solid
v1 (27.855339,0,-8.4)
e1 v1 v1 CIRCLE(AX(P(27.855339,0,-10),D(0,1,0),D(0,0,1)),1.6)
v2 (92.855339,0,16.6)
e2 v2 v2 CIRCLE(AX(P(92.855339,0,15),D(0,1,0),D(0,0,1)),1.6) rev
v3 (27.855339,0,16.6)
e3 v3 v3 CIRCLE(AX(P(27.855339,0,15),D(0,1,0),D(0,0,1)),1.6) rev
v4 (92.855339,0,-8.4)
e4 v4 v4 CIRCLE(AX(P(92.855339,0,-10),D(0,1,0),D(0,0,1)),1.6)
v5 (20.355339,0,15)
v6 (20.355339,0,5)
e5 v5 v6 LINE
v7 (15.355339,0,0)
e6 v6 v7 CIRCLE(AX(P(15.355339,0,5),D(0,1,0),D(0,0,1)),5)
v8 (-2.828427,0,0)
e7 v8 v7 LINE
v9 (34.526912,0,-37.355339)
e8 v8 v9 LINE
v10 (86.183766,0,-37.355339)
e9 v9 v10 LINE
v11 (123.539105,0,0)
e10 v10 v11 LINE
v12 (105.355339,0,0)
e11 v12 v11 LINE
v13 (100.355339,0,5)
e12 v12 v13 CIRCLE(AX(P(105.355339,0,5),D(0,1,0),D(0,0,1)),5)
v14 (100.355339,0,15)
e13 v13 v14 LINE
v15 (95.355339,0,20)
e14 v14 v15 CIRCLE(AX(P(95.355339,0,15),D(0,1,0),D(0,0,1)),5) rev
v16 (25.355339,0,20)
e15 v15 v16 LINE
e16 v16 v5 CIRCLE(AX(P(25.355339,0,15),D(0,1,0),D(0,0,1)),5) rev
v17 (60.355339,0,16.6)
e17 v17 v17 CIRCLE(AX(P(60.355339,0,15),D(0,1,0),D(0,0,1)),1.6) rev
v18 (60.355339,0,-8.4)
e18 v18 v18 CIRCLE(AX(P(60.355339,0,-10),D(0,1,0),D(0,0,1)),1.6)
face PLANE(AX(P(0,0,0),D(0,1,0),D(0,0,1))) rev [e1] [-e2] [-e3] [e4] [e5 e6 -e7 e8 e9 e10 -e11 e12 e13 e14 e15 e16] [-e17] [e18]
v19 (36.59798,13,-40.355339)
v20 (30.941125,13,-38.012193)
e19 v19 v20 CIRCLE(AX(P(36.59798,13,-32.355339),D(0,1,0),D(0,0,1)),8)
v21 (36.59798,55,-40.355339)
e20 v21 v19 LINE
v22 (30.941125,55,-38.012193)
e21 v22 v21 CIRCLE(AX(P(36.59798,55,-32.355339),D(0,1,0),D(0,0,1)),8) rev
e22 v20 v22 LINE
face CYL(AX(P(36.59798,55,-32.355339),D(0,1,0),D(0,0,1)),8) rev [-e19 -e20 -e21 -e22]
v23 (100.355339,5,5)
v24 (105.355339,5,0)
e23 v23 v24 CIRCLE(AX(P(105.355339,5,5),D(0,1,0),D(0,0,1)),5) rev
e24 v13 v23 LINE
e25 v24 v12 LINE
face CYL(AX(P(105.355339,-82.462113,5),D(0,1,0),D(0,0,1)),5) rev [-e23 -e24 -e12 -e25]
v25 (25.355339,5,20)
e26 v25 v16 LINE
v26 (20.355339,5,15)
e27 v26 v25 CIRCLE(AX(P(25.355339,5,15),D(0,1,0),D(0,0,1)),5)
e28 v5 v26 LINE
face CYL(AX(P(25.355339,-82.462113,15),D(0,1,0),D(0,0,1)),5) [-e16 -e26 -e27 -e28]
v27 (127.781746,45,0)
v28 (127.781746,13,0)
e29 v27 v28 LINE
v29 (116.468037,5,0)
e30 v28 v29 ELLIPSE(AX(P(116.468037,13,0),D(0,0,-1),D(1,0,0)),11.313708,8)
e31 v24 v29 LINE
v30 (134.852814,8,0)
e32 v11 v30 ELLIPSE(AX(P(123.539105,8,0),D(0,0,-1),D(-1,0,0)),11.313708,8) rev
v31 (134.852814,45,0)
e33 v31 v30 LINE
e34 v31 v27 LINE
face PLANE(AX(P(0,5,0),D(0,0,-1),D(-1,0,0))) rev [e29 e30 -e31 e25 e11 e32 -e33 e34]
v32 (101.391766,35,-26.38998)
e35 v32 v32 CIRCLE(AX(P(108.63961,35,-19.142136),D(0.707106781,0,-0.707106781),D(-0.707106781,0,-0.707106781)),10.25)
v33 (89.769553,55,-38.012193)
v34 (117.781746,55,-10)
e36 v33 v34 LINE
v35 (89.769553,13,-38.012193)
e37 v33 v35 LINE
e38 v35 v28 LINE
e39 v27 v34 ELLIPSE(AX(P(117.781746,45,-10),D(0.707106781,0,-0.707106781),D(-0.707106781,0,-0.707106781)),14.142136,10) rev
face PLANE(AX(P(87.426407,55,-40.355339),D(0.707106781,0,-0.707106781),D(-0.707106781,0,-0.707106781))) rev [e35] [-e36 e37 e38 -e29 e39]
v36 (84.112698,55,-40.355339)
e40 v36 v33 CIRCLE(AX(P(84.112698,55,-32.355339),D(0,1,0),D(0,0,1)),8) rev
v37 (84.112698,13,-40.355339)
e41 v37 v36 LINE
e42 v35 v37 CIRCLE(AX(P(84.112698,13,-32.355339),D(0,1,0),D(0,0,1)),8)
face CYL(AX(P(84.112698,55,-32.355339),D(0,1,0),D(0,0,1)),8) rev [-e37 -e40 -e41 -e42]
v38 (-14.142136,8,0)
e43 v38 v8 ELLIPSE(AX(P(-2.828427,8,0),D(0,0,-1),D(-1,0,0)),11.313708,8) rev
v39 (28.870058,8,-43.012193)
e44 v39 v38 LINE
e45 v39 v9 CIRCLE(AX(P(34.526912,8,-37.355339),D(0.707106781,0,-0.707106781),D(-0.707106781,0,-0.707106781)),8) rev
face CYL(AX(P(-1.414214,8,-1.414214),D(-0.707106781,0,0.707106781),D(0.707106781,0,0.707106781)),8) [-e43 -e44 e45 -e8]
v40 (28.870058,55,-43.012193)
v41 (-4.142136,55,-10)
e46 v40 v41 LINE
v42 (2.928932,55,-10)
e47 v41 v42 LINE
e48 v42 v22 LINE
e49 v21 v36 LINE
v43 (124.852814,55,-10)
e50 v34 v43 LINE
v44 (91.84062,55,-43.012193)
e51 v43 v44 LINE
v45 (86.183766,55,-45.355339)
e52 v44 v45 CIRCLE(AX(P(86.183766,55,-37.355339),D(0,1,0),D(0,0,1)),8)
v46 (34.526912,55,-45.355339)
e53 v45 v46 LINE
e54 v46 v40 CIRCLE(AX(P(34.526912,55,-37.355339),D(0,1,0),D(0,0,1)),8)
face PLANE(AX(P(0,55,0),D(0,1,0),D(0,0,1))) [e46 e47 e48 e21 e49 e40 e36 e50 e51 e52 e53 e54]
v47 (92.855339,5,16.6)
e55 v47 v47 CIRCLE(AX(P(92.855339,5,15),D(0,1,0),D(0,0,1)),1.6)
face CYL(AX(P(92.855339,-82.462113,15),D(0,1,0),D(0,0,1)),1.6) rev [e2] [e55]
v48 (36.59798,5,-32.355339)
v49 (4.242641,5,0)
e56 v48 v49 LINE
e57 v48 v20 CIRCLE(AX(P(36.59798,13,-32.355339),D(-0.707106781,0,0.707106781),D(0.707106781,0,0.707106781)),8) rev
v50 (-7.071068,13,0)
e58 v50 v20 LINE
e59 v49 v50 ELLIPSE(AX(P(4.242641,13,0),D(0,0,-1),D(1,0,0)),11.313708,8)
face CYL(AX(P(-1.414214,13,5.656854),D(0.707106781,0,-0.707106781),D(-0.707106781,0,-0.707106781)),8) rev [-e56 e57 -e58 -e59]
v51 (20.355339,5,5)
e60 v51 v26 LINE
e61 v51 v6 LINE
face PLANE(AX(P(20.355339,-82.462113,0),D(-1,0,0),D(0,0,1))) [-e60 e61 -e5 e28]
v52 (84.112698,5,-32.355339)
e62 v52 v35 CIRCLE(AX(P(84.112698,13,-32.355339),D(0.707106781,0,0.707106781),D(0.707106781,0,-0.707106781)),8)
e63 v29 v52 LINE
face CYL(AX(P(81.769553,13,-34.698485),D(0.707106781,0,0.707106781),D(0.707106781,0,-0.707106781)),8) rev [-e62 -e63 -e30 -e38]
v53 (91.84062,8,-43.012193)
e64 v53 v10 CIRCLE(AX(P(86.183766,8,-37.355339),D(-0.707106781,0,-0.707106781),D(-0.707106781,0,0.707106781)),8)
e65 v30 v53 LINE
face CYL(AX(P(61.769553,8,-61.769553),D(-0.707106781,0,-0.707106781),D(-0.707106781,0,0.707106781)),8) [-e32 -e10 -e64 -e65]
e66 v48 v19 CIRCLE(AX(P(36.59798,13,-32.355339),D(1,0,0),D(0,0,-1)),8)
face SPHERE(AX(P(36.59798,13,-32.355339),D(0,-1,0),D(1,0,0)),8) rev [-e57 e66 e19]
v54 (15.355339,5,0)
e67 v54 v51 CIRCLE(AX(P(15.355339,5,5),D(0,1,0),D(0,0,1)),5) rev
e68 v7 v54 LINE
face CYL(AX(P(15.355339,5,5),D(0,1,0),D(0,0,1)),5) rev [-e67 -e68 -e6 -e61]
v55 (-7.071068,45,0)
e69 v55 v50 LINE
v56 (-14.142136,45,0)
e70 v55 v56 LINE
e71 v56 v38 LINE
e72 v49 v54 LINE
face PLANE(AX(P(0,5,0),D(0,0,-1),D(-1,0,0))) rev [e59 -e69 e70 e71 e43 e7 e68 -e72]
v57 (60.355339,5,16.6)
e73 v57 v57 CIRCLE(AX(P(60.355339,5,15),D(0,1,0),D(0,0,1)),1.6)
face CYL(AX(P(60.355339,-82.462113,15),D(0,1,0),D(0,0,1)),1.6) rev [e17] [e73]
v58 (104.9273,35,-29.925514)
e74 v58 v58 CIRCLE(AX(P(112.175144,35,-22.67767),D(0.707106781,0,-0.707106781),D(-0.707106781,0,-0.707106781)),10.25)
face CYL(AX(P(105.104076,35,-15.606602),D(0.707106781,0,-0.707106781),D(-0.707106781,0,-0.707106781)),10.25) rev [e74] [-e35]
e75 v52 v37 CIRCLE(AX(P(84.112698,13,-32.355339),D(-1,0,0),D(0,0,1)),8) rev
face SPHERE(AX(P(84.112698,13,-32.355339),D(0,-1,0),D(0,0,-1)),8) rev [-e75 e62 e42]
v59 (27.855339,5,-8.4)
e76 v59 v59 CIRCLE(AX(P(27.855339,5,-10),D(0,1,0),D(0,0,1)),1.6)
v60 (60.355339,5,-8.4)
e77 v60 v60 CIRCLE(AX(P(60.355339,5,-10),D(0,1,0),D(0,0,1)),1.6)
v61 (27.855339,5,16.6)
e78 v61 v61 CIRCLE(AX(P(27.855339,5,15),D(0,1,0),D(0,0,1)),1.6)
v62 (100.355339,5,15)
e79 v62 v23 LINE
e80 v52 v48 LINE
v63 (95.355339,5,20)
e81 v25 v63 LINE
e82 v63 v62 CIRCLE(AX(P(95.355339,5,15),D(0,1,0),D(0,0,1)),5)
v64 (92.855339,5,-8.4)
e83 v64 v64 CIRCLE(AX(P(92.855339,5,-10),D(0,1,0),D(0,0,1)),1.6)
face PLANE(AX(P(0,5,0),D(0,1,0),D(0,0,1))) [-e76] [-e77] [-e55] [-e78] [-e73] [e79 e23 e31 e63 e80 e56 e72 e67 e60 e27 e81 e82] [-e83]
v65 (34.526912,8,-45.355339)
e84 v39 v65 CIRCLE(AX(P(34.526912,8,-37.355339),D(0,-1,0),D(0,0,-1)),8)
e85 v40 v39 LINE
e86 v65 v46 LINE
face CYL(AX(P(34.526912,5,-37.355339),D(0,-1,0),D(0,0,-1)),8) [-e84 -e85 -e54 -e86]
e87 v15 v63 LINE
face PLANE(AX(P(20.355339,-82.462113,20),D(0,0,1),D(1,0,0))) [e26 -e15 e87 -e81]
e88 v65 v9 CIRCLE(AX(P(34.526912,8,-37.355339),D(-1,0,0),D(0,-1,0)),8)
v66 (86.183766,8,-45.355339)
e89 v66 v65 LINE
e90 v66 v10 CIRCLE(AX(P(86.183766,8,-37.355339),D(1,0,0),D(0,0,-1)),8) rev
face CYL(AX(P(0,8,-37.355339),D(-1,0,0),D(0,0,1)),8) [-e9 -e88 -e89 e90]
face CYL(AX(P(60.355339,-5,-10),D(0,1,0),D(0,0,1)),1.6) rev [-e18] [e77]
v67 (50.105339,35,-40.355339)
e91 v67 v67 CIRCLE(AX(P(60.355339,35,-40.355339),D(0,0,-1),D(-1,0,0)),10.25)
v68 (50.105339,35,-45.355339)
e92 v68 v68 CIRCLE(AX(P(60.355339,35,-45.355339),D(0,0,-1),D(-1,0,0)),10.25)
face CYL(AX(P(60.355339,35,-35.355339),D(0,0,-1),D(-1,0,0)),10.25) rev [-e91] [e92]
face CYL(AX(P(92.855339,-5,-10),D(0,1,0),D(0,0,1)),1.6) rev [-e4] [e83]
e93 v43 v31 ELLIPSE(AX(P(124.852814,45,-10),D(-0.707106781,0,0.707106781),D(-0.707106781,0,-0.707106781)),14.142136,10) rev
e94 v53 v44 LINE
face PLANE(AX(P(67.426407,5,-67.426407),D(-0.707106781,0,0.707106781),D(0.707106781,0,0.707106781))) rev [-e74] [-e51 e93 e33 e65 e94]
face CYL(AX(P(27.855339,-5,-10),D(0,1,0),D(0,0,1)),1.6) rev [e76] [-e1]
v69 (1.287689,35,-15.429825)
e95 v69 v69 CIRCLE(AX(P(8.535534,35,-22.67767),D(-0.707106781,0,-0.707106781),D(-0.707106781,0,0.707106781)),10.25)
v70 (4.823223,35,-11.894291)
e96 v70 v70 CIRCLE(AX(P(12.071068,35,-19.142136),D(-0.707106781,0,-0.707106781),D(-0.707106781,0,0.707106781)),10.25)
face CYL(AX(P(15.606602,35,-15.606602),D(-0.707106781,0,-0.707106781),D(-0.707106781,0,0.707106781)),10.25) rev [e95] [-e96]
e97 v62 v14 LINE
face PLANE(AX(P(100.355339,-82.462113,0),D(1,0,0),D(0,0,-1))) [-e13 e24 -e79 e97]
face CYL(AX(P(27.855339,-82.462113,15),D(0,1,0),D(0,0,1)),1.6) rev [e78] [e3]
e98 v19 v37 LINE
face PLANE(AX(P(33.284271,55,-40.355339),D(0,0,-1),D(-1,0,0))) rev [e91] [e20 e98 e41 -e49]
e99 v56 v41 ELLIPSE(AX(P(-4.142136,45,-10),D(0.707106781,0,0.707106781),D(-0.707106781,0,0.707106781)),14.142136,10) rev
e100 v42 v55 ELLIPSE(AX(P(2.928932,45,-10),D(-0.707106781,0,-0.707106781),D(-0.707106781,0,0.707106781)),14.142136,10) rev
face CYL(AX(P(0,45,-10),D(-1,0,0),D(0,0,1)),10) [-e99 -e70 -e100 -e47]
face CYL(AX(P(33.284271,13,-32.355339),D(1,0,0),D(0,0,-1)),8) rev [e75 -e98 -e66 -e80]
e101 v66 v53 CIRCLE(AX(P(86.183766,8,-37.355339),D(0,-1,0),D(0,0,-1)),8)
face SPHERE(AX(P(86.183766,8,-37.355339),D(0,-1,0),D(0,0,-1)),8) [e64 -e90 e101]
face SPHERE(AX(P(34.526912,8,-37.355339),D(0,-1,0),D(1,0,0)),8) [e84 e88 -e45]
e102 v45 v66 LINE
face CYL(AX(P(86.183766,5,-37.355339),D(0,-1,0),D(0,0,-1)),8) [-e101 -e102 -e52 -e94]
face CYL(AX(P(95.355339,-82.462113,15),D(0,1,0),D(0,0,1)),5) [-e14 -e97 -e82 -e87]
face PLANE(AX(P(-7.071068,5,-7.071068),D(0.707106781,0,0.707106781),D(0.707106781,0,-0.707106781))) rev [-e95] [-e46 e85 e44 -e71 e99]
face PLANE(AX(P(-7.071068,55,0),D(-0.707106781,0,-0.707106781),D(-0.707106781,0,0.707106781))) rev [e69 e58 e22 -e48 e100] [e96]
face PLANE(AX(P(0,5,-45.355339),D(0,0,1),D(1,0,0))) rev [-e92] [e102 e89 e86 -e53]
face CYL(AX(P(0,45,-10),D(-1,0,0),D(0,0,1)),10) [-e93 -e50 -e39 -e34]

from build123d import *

# Parameters (mm, degrees)
BOSS_EXTRUDE1_DEPTH = 5
BOSS_EXTRUDE2_DEPTH = 50
CUT_EXTRUDE1_DEPTH  = 10
SKETCH6_R           = 10.25
CUT_EXTRUDE2_DEPTH  = 10
SKETCH7_R           = 10.25
CUT_EXTRUDE3_DEPTH  = 10
SKETCH8_R           = 1.6
CUT_EXTRUDE4_DEPTH  = 10
FILLET1_R           = 8
SKETCH10_W          = 80
SKETCH10_H          = 20
SKETCH10_R          = 1.6
BOSS_EXTRUDE5_DEPTH = 5
FILLET4_R           = 5
FILLET5_R           = 10


with BuildPart() as part:
    # Sketch2 → Boss-Extrude1 (new body)
    with BuildSketch(Plane(origin=(0, 0, 0), x_dir=(1, 0, 0), z_dir=(0, 1, 0))):
        Polygon((-14.142135624, 0), (0, 0), (35.355339059, 35.355339059), (85.355339059, 35.355339059), (120.710678119, 0), (134.852813742, 0), (89.497474683, 45.355339059), (31.213203436, 45.355339059), align=None)
        Polygon((85.355339059, 35.355339059), (35.355339059, 35.355339059), (0, 0), (120.710678119, 0), align=None)
    extrude(amount=BOSS_EXTRUDE1_DEPTH)

    # Sketch3 → Boss-Extrude2 (add)
    with BuildSketch(Plane(origin=(0, 5, 0), x_dir=(1, 0, 0), z_dir=(0, 1, 0))):
        Polygon((-14.142135624, 0), (31.213203436, 45.355339059), (89.497474683, 45.355339059), (134.852813742, 0), (127.781745931, 0), (87.426406871, 40.355339059), (33.284271247, 40.355339059), (-7.071067812, 0), align=None)
    extrude(amount=BOSS_EXTRUDE2_DEPTH)

    # Sketch5 → Cut-Extrude1 (cut)
    with BuildSketch(Plane(origin=(0, 0, -45.355339059), x_dir=(-1, 0, 0), z_dir=(0, 0, -1))):
        with BuildLine():
            ThreePointArc((-50.105339059, 35), (-60.355339059, 45.25), (-70.605339059, 35))
            Line((-70.605339059, 35), (-50.105339059, 35))
        make_face()
        with BuildLine():
            Line((-50.105339059, 35), (-70.605339059, 35))
            ThreePointArc((-70.605339059, 35), (-60.355339059, 24.75), (-50.105339059, 35))
        make_face()
    extrude(amount=-CUT_EXTRUDE1_DEPTH, mode=Mode.SUBTRACT)

    # Sketch6 → Cut-Extrude2 (cut)
    with BuildSketch(Plane(origin=(67.426406871, 0, -67.426406871), x_dir=(-0.7071067811865509, 0, -0.7071067811865441), z_dir=(0.7071067811865441, 0, -0.7071067811865509))):
        with Locations((-63.284271247, 35)):
            Circle(SKETCH6_R)
    extrude(amount=-CUT_EXTRUDE2_DEPTH, mode=Mode.SUBTRACT)

    # Sketch7 → Cut-Extrude3 (cut)
    with BuildSketch(Plane(origin=(-7.071067812, 0, -7.071067812), x_dir=(-0.7071067811865513, 0, 0.7071067811865438), z_dir=(-0.7071067811865438, 0, -0.7071067811865513))):
        with Locations((-22.071067812, 35)):
            Circle(SKETCH7_R)
    extrude(amount=-CUT_EXTRUDE3_DEPTH, mode=Mode.SUBTRACT)

    # Sketch8 → Cut-Extrude4 (cut)
    with BuildSketch(Plane(origin=(0, 5, 0), x_dir=(1, 0, 0), z_dir=(0, 1, 0))):
        with Locations(Location((60.355339059, 10, 0), (0, 0, 270))):
            Circle(SKETCH8_R)
        with Locations(Location((92.855339059, 10, 0), (0, 0, 270))):
            Circle(SKETCH8_R)
        with Locations(Location((27.855339059, 10, 0), (0, 0, 270))):
            Circle(SKETCH8_R)
    extrude(amount=-CUT_EXTRUDE4_DEPTH, mode=Mode.SUBTRACT)

    # Fillet1
    fillet1_edges = [part.edges().sort_by_distance(p)[0] for p in [
        (13.106601718, 5, -20.17766953),
        (60.355339059, 5, -40.355339059),
        (33.284271247, 30, -40.355339059),
        (107.604076401, 5, -20.17766953),
        (87.426406871, 30, -40.355339059),
        (60.355339059, 0, -45.355339059),
        (112.175144213, 0, -22.67766953),
        (8.535533906, 0, -22.67766953),
        (31.213203436, 27.5, -45.355339059),
        (89.497474683, 27.5, -45.355339059),
    ]]
    fillet(fillet1_edges, radius=FILLET1_R)

    # Sketch10 → Boss-Extrude5 (add)
    with BuildSketch(Plane(origin=(0, 5, 0), x_dir=(1, 0, 0), z_dir=(0, 1, 0))):
        with Locations((60.355339059, -10)):
            Rectangle(SKETCH10_W, SKETCH10_H)
        with Locations(Location((60.355339059, -15, 0), (0, 0, 270))):
            Circle(SKETCH10_R, mode=Mode.SUBTRACT)
        with Locations(Location((92.855339059, -15, 0), (0, 0, 270))):
            Circle(SKETCH10_R, mode=Mode.SUBTRACT)
        with Locations(Location((27.855339059, -15, 0), (0, 0, 270))):
            Circle(SKETCH10_R, mode=Mode.SUBTRACT)
    extrude(amount=-BOSS_EXTRUDE5_DEPTH)

    # Fillet4
    fillet4_edges = [part.edges().sort_by_distance(p)[0] for p in [
        (100.355339059, 2.5, 20),
        (100.355339059, 2.5, 0),
        (20.355339059, 2.5, 0),
        (20.355339059, 2.5, 20),
    ]]
    fillet(fillet4_edges, radius=FILLET4_R)

    # Fillet5
    # the kernel refuses this fillet: 10 mm, written as the material it takes off along each edge
    with BuildSketch(Plane(origin=(17.928932188, 55, 0), x_dir=(0, -1, 0), z_dir=(-1, 0, 0))) as fillet5_piece_1:
        with BuildLine():
            CenterArc((FILLET5_R, -FILLET5_R), FILLET5_R, 90, 90)
            Line((0, -FILLET5_R), (0, 0))
            Line((0, 0), (FILLET5_R, 0))
        make_face()
    extrude(amount=57.071067812, mode=Mode.SUBTRACT)
    with BuildSketch(Plane(origin=(159.852813742, 55, 0), x_dir=(0, 0, -1), z_dir=(-1, 0, 0))) as fillet5_piece_2:
        with BuildLine():
            CenterArc((FILLET5_R, FILLET5_R), FILLET5_R, 180, 90)
            Line((0, FILLET5_R), (0, 0))
            Line((0, 0), (FILLET5_R, 0))
        make_face()
    extrude(amount=57.071067812, mode=Mode.SUBTRACT)


solid = part.part
